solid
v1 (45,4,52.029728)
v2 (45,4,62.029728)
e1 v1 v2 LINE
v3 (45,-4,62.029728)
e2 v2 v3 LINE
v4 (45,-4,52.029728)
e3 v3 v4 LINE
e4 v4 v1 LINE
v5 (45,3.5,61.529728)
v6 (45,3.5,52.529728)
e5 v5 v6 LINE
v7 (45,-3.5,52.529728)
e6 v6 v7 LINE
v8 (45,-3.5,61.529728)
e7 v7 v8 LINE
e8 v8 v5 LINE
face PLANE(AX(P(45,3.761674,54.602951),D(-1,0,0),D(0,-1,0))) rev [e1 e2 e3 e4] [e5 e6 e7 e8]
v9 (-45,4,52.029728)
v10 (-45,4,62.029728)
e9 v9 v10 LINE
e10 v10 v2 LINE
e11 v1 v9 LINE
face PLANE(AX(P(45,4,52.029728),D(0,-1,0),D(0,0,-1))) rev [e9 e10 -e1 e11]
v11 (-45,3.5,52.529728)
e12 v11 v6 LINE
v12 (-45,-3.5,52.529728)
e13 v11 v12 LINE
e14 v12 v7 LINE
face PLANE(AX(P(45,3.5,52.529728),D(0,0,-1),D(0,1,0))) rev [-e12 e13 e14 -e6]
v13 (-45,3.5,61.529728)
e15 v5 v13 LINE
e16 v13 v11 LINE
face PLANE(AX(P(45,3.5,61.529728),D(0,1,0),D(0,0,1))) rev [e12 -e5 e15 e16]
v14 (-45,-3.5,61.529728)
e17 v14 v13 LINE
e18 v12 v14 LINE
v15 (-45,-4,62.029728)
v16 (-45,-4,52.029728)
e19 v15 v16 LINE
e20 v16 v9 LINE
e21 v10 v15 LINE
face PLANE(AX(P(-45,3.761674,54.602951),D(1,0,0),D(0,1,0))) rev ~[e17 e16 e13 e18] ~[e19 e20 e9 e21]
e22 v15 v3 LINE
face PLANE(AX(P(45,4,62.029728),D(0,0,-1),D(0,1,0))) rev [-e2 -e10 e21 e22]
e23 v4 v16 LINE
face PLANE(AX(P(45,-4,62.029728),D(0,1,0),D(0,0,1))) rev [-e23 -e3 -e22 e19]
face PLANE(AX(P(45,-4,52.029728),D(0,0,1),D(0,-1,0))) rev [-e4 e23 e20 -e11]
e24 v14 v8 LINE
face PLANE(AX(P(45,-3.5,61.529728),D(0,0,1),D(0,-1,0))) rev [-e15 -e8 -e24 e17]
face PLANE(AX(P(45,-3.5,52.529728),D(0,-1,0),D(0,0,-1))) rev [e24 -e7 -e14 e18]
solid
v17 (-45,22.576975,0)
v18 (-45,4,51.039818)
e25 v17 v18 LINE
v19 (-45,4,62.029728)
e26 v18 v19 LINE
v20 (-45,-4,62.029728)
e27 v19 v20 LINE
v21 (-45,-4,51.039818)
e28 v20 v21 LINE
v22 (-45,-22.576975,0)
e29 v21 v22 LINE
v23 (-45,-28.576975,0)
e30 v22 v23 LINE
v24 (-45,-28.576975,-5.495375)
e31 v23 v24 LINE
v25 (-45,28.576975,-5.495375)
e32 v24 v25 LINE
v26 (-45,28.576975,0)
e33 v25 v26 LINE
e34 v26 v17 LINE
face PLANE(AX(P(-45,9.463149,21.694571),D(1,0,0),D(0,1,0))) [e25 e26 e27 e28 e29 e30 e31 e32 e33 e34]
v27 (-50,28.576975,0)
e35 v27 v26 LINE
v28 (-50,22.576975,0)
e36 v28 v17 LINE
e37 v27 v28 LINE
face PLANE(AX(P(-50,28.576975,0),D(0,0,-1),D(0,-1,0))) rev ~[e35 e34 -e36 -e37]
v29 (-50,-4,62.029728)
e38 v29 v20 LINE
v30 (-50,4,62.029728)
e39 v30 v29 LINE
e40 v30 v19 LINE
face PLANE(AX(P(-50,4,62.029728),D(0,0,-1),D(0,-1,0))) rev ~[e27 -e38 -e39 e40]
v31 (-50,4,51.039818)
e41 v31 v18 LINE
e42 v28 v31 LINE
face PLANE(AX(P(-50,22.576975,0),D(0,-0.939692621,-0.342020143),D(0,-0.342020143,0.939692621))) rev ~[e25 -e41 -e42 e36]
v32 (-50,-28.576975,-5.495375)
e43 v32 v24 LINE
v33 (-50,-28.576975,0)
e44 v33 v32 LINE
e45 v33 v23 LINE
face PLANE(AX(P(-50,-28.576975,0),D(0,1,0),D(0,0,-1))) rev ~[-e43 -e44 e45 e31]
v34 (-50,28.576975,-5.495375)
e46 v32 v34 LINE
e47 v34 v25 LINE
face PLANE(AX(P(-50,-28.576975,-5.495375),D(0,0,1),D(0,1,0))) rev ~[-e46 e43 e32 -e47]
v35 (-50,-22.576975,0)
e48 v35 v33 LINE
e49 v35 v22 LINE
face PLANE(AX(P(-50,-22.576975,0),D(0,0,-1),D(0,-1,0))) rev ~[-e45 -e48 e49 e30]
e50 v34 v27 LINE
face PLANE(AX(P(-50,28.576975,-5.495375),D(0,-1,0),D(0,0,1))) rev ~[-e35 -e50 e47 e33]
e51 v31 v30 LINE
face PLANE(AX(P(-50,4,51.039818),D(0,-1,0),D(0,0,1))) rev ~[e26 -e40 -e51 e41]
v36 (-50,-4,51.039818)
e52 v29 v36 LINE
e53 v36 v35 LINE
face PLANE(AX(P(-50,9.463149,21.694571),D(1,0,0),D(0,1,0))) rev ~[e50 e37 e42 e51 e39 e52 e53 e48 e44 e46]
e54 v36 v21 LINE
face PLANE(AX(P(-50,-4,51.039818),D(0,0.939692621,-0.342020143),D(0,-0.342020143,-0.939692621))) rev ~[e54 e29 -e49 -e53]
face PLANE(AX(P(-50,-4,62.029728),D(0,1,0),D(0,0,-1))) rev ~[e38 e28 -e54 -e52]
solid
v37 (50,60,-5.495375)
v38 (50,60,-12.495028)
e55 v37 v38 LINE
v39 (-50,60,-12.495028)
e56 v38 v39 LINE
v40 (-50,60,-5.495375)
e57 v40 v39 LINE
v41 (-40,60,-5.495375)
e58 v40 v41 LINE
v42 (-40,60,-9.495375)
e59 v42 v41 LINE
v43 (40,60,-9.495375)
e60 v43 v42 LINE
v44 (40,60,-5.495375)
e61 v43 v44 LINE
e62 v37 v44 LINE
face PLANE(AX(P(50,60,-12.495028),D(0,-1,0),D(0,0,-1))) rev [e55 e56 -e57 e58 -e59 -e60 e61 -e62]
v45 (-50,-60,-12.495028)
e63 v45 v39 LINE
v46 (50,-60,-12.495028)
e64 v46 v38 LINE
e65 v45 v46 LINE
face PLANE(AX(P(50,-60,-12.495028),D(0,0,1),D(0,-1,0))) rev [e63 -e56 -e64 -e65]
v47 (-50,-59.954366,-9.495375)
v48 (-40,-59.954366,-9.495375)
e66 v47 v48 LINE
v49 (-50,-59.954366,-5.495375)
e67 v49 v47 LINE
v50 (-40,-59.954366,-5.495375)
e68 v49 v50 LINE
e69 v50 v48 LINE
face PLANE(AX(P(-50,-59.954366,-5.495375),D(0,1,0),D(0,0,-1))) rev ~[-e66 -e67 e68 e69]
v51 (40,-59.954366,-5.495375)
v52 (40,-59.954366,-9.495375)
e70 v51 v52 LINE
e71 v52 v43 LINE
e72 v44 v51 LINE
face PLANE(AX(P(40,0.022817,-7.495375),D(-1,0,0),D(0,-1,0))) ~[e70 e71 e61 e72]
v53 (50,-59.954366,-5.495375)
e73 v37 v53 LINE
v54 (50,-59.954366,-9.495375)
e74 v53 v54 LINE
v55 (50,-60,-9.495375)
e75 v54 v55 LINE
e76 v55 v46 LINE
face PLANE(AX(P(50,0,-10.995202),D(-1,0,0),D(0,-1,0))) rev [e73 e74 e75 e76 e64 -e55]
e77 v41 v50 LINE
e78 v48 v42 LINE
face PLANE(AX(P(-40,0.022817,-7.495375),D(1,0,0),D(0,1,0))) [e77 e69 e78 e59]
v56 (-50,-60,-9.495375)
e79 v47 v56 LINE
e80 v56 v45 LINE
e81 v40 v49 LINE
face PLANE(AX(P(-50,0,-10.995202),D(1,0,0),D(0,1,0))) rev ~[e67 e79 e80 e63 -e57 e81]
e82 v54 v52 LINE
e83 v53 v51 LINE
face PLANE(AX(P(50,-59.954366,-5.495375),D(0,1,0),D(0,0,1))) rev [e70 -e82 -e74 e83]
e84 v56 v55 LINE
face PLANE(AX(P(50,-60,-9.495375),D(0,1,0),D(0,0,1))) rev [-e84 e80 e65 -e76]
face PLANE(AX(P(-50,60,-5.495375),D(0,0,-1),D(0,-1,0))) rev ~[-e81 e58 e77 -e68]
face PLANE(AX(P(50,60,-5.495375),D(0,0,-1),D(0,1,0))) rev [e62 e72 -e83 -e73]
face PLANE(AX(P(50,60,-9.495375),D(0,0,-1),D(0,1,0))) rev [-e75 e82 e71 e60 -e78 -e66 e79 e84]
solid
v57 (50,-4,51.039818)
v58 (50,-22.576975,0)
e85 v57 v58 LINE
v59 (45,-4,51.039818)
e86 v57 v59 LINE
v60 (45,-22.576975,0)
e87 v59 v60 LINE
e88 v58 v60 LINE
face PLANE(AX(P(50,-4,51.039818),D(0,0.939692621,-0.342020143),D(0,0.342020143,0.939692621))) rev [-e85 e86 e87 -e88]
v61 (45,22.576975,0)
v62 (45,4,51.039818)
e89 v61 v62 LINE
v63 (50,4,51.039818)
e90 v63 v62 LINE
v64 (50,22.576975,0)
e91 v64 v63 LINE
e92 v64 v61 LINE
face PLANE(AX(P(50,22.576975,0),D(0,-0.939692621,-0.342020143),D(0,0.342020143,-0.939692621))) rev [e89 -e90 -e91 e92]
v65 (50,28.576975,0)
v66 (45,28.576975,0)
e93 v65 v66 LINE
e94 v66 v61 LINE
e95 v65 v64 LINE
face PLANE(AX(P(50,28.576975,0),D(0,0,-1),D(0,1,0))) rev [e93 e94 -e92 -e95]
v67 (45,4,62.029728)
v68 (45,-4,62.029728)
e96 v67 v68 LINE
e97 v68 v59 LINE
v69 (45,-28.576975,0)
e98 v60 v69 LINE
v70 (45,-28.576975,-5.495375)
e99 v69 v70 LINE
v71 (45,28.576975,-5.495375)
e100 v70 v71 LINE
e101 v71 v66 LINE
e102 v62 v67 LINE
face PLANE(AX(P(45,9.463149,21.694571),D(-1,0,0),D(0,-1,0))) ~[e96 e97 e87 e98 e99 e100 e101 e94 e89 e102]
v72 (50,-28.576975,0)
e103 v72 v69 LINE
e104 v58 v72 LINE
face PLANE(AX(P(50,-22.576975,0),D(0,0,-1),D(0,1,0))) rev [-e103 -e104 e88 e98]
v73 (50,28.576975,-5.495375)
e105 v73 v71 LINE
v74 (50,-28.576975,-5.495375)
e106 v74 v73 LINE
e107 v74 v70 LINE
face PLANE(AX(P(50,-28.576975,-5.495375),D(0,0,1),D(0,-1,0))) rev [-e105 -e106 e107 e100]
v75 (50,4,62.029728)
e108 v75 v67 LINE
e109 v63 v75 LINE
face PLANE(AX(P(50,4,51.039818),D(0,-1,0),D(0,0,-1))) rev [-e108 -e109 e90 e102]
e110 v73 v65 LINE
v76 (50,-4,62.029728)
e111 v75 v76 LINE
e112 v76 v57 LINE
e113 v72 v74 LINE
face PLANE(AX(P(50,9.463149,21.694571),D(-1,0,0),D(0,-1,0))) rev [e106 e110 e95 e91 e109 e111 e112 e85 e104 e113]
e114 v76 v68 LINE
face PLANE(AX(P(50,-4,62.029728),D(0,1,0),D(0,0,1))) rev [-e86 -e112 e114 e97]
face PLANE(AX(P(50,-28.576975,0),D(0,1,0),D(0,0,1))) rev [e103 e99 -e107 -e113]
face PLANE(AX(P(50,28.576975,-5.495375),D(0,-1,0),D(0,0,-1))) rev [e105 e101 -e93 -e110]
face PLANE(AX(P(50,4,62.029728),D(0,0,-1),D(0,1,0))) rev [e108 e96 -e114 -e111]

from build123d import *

# Parameters (mm, degrees)
F1_W     = 57.1539493034
F1_H     = 5
F2_DEPTH = 5
F3_DEPTH = 10
F4_DEPTH = 50
F7_DEPTH = 45


with BuildPart() as f2:
    # F1 (on offset) → F2 (new body)
    with BuildSketch(Plane.YZ.offset(-50)):
        Polygon((4, 51.0398183773), (4, 0), (22.5769746517, 0), align=None)
        Polygon((-22.5769746517, 0), (-4, 0), (-4, 51.0398183773), align=None)
        Polygon((-4, 0), (0, 0), (0, 52.0297280551), (-3.6397023427, 52.0297280551), (-4, 51.0398183773), align=None)
        Polygon((0, 52.0297280551), (0, 0), (4, 0), (4, 51.0398183773), (3.6397023427, 52.0297280551), align=None)
        Polygon((-3.6397023427, 52.0297280551), (0, 62.0297280551), (-4, 62.0297280551), (-4, 52.0297280551), align=None)
        Polygon((-3.6397023427, 52.0297280551), (0, 52.0297280551), (0, 62.0297280551), align=None)
        Polygon((4, 62.0297280551), (0, 62.0297280551), (3.6397023427, 52.0297280551), (4, 52.0297280551), align=None)
        Polygon((0, 62.0297280551), (0, 52.0297280551), (3.6397023427, 52.0297280551), align=None)
        Polygon((-4, 51.0398183773), (-3.6397023427, 52.0297280551), (-4, 52.0297280551), align=None)
        Polygon((4, 52.0297280551), (3.6397023427, 52.0297280551), (4, 51.0398183773), align=None)
        with Locations((0, -2.995375049)):
            Rectangle(F1_W, F1_H)
        Polygon((4, 0), (0, 0), (-4, 0), (-22.5769746517, 0), (-28.5769746517, 0), (-28.5769746517, -0.495375049), (28.5769746517, -0.495375049), (28.5769746517, 0), (22.5769746517, 0), align=None)
    extrude(amount=F2_DEPTH)


with BuildPart() as f3:
    # F1 (on offset) → F3 (new body)
    with BuildSketch(Plane.YZ.offset(-50)):
        Polygon((28.5769746517, -5.495375049), (-28.5769746517, -5.495375049), (-59.9543659465, -5.495375049), (-59.9543659465, -9.495375049), (60, -9.495375049), (60, -5.495375049), align=None)
    extrude(amount=F3_DEPTH)

    # F1 (on offset) → F4 (join)
    with BuildSketch(Plane.YZ.offset(-50)):
        Polygon((60, -9.495375049), (-59.9543659465, -9.495375049), (-60, -9.495375049), (-60, -12.4950279511), (60, -12.4950279511), align=None)
    extrude(amount=F4_DEPTH)

    # F9: F3 across plane


with BuildPart() as f7:
    # F6 (on offset) → F7 (new body)
    with BuildSketch(Plane.YZ.offset(-45)):
        Polygon((3.5, 52.5297280551), (4, 52.0297280551), (4, 57.0297280551), (3.5, 57.0297280551), align=None)
        Polygon((0, 52.0297280551), (4, 52.0297280551), (3.5, 52.5297280551), (0, 52.5297280551), align=None)
        Polygon((-4, 52.0297280551), (0, 52.0297280551), (0, 52.5297280551), (-3.5, 52.5297280551), align=None)
        Polygon((3.5, 57.0297280551), (4, 57.0297280551), (4, 62.0297280551), (3.5, 61.5297280551), align=None)
        Polygon((-4, 57.0297280551), (-4, 52.0297280551), (-3.5, 52.5297280551), (-3.5, 57.0297280551), align=None)
        Polygon((3.5, 61.5297280551), (4, 62.0297280551), (0, 62.0297280551), (0, 61.5297280551), align=None)
        Polygon((-4, 62.0297280551), (-4, 57.0297280551), (-3.5, 57.0297280551), (-3.5, 61.5297280551), align=None)
        Polygon((0, 61.5297280551), (0, 62.0297280551), (-4, 62.0297280551), (-3.5, 61.5297280551), align=None)
    extrude(amount=F7_DEPTH)

    # F10: F7 across plane


with BuildPart() as f8_1:
    # F8: instance of F2
    add(f2.part.mirror(Plane.YZ))


with BuildPart() as f3_1:
    add(f3.part)
    add(f3.part.mirror(Plane.YZ))


with BuildPart() as f7_1:
    add(f7.part)
    add(f7.part.mirror(Plane.YZ))


solid = Compound([f2.part, f8_1.part, f3_1.part, f7_1.part])
